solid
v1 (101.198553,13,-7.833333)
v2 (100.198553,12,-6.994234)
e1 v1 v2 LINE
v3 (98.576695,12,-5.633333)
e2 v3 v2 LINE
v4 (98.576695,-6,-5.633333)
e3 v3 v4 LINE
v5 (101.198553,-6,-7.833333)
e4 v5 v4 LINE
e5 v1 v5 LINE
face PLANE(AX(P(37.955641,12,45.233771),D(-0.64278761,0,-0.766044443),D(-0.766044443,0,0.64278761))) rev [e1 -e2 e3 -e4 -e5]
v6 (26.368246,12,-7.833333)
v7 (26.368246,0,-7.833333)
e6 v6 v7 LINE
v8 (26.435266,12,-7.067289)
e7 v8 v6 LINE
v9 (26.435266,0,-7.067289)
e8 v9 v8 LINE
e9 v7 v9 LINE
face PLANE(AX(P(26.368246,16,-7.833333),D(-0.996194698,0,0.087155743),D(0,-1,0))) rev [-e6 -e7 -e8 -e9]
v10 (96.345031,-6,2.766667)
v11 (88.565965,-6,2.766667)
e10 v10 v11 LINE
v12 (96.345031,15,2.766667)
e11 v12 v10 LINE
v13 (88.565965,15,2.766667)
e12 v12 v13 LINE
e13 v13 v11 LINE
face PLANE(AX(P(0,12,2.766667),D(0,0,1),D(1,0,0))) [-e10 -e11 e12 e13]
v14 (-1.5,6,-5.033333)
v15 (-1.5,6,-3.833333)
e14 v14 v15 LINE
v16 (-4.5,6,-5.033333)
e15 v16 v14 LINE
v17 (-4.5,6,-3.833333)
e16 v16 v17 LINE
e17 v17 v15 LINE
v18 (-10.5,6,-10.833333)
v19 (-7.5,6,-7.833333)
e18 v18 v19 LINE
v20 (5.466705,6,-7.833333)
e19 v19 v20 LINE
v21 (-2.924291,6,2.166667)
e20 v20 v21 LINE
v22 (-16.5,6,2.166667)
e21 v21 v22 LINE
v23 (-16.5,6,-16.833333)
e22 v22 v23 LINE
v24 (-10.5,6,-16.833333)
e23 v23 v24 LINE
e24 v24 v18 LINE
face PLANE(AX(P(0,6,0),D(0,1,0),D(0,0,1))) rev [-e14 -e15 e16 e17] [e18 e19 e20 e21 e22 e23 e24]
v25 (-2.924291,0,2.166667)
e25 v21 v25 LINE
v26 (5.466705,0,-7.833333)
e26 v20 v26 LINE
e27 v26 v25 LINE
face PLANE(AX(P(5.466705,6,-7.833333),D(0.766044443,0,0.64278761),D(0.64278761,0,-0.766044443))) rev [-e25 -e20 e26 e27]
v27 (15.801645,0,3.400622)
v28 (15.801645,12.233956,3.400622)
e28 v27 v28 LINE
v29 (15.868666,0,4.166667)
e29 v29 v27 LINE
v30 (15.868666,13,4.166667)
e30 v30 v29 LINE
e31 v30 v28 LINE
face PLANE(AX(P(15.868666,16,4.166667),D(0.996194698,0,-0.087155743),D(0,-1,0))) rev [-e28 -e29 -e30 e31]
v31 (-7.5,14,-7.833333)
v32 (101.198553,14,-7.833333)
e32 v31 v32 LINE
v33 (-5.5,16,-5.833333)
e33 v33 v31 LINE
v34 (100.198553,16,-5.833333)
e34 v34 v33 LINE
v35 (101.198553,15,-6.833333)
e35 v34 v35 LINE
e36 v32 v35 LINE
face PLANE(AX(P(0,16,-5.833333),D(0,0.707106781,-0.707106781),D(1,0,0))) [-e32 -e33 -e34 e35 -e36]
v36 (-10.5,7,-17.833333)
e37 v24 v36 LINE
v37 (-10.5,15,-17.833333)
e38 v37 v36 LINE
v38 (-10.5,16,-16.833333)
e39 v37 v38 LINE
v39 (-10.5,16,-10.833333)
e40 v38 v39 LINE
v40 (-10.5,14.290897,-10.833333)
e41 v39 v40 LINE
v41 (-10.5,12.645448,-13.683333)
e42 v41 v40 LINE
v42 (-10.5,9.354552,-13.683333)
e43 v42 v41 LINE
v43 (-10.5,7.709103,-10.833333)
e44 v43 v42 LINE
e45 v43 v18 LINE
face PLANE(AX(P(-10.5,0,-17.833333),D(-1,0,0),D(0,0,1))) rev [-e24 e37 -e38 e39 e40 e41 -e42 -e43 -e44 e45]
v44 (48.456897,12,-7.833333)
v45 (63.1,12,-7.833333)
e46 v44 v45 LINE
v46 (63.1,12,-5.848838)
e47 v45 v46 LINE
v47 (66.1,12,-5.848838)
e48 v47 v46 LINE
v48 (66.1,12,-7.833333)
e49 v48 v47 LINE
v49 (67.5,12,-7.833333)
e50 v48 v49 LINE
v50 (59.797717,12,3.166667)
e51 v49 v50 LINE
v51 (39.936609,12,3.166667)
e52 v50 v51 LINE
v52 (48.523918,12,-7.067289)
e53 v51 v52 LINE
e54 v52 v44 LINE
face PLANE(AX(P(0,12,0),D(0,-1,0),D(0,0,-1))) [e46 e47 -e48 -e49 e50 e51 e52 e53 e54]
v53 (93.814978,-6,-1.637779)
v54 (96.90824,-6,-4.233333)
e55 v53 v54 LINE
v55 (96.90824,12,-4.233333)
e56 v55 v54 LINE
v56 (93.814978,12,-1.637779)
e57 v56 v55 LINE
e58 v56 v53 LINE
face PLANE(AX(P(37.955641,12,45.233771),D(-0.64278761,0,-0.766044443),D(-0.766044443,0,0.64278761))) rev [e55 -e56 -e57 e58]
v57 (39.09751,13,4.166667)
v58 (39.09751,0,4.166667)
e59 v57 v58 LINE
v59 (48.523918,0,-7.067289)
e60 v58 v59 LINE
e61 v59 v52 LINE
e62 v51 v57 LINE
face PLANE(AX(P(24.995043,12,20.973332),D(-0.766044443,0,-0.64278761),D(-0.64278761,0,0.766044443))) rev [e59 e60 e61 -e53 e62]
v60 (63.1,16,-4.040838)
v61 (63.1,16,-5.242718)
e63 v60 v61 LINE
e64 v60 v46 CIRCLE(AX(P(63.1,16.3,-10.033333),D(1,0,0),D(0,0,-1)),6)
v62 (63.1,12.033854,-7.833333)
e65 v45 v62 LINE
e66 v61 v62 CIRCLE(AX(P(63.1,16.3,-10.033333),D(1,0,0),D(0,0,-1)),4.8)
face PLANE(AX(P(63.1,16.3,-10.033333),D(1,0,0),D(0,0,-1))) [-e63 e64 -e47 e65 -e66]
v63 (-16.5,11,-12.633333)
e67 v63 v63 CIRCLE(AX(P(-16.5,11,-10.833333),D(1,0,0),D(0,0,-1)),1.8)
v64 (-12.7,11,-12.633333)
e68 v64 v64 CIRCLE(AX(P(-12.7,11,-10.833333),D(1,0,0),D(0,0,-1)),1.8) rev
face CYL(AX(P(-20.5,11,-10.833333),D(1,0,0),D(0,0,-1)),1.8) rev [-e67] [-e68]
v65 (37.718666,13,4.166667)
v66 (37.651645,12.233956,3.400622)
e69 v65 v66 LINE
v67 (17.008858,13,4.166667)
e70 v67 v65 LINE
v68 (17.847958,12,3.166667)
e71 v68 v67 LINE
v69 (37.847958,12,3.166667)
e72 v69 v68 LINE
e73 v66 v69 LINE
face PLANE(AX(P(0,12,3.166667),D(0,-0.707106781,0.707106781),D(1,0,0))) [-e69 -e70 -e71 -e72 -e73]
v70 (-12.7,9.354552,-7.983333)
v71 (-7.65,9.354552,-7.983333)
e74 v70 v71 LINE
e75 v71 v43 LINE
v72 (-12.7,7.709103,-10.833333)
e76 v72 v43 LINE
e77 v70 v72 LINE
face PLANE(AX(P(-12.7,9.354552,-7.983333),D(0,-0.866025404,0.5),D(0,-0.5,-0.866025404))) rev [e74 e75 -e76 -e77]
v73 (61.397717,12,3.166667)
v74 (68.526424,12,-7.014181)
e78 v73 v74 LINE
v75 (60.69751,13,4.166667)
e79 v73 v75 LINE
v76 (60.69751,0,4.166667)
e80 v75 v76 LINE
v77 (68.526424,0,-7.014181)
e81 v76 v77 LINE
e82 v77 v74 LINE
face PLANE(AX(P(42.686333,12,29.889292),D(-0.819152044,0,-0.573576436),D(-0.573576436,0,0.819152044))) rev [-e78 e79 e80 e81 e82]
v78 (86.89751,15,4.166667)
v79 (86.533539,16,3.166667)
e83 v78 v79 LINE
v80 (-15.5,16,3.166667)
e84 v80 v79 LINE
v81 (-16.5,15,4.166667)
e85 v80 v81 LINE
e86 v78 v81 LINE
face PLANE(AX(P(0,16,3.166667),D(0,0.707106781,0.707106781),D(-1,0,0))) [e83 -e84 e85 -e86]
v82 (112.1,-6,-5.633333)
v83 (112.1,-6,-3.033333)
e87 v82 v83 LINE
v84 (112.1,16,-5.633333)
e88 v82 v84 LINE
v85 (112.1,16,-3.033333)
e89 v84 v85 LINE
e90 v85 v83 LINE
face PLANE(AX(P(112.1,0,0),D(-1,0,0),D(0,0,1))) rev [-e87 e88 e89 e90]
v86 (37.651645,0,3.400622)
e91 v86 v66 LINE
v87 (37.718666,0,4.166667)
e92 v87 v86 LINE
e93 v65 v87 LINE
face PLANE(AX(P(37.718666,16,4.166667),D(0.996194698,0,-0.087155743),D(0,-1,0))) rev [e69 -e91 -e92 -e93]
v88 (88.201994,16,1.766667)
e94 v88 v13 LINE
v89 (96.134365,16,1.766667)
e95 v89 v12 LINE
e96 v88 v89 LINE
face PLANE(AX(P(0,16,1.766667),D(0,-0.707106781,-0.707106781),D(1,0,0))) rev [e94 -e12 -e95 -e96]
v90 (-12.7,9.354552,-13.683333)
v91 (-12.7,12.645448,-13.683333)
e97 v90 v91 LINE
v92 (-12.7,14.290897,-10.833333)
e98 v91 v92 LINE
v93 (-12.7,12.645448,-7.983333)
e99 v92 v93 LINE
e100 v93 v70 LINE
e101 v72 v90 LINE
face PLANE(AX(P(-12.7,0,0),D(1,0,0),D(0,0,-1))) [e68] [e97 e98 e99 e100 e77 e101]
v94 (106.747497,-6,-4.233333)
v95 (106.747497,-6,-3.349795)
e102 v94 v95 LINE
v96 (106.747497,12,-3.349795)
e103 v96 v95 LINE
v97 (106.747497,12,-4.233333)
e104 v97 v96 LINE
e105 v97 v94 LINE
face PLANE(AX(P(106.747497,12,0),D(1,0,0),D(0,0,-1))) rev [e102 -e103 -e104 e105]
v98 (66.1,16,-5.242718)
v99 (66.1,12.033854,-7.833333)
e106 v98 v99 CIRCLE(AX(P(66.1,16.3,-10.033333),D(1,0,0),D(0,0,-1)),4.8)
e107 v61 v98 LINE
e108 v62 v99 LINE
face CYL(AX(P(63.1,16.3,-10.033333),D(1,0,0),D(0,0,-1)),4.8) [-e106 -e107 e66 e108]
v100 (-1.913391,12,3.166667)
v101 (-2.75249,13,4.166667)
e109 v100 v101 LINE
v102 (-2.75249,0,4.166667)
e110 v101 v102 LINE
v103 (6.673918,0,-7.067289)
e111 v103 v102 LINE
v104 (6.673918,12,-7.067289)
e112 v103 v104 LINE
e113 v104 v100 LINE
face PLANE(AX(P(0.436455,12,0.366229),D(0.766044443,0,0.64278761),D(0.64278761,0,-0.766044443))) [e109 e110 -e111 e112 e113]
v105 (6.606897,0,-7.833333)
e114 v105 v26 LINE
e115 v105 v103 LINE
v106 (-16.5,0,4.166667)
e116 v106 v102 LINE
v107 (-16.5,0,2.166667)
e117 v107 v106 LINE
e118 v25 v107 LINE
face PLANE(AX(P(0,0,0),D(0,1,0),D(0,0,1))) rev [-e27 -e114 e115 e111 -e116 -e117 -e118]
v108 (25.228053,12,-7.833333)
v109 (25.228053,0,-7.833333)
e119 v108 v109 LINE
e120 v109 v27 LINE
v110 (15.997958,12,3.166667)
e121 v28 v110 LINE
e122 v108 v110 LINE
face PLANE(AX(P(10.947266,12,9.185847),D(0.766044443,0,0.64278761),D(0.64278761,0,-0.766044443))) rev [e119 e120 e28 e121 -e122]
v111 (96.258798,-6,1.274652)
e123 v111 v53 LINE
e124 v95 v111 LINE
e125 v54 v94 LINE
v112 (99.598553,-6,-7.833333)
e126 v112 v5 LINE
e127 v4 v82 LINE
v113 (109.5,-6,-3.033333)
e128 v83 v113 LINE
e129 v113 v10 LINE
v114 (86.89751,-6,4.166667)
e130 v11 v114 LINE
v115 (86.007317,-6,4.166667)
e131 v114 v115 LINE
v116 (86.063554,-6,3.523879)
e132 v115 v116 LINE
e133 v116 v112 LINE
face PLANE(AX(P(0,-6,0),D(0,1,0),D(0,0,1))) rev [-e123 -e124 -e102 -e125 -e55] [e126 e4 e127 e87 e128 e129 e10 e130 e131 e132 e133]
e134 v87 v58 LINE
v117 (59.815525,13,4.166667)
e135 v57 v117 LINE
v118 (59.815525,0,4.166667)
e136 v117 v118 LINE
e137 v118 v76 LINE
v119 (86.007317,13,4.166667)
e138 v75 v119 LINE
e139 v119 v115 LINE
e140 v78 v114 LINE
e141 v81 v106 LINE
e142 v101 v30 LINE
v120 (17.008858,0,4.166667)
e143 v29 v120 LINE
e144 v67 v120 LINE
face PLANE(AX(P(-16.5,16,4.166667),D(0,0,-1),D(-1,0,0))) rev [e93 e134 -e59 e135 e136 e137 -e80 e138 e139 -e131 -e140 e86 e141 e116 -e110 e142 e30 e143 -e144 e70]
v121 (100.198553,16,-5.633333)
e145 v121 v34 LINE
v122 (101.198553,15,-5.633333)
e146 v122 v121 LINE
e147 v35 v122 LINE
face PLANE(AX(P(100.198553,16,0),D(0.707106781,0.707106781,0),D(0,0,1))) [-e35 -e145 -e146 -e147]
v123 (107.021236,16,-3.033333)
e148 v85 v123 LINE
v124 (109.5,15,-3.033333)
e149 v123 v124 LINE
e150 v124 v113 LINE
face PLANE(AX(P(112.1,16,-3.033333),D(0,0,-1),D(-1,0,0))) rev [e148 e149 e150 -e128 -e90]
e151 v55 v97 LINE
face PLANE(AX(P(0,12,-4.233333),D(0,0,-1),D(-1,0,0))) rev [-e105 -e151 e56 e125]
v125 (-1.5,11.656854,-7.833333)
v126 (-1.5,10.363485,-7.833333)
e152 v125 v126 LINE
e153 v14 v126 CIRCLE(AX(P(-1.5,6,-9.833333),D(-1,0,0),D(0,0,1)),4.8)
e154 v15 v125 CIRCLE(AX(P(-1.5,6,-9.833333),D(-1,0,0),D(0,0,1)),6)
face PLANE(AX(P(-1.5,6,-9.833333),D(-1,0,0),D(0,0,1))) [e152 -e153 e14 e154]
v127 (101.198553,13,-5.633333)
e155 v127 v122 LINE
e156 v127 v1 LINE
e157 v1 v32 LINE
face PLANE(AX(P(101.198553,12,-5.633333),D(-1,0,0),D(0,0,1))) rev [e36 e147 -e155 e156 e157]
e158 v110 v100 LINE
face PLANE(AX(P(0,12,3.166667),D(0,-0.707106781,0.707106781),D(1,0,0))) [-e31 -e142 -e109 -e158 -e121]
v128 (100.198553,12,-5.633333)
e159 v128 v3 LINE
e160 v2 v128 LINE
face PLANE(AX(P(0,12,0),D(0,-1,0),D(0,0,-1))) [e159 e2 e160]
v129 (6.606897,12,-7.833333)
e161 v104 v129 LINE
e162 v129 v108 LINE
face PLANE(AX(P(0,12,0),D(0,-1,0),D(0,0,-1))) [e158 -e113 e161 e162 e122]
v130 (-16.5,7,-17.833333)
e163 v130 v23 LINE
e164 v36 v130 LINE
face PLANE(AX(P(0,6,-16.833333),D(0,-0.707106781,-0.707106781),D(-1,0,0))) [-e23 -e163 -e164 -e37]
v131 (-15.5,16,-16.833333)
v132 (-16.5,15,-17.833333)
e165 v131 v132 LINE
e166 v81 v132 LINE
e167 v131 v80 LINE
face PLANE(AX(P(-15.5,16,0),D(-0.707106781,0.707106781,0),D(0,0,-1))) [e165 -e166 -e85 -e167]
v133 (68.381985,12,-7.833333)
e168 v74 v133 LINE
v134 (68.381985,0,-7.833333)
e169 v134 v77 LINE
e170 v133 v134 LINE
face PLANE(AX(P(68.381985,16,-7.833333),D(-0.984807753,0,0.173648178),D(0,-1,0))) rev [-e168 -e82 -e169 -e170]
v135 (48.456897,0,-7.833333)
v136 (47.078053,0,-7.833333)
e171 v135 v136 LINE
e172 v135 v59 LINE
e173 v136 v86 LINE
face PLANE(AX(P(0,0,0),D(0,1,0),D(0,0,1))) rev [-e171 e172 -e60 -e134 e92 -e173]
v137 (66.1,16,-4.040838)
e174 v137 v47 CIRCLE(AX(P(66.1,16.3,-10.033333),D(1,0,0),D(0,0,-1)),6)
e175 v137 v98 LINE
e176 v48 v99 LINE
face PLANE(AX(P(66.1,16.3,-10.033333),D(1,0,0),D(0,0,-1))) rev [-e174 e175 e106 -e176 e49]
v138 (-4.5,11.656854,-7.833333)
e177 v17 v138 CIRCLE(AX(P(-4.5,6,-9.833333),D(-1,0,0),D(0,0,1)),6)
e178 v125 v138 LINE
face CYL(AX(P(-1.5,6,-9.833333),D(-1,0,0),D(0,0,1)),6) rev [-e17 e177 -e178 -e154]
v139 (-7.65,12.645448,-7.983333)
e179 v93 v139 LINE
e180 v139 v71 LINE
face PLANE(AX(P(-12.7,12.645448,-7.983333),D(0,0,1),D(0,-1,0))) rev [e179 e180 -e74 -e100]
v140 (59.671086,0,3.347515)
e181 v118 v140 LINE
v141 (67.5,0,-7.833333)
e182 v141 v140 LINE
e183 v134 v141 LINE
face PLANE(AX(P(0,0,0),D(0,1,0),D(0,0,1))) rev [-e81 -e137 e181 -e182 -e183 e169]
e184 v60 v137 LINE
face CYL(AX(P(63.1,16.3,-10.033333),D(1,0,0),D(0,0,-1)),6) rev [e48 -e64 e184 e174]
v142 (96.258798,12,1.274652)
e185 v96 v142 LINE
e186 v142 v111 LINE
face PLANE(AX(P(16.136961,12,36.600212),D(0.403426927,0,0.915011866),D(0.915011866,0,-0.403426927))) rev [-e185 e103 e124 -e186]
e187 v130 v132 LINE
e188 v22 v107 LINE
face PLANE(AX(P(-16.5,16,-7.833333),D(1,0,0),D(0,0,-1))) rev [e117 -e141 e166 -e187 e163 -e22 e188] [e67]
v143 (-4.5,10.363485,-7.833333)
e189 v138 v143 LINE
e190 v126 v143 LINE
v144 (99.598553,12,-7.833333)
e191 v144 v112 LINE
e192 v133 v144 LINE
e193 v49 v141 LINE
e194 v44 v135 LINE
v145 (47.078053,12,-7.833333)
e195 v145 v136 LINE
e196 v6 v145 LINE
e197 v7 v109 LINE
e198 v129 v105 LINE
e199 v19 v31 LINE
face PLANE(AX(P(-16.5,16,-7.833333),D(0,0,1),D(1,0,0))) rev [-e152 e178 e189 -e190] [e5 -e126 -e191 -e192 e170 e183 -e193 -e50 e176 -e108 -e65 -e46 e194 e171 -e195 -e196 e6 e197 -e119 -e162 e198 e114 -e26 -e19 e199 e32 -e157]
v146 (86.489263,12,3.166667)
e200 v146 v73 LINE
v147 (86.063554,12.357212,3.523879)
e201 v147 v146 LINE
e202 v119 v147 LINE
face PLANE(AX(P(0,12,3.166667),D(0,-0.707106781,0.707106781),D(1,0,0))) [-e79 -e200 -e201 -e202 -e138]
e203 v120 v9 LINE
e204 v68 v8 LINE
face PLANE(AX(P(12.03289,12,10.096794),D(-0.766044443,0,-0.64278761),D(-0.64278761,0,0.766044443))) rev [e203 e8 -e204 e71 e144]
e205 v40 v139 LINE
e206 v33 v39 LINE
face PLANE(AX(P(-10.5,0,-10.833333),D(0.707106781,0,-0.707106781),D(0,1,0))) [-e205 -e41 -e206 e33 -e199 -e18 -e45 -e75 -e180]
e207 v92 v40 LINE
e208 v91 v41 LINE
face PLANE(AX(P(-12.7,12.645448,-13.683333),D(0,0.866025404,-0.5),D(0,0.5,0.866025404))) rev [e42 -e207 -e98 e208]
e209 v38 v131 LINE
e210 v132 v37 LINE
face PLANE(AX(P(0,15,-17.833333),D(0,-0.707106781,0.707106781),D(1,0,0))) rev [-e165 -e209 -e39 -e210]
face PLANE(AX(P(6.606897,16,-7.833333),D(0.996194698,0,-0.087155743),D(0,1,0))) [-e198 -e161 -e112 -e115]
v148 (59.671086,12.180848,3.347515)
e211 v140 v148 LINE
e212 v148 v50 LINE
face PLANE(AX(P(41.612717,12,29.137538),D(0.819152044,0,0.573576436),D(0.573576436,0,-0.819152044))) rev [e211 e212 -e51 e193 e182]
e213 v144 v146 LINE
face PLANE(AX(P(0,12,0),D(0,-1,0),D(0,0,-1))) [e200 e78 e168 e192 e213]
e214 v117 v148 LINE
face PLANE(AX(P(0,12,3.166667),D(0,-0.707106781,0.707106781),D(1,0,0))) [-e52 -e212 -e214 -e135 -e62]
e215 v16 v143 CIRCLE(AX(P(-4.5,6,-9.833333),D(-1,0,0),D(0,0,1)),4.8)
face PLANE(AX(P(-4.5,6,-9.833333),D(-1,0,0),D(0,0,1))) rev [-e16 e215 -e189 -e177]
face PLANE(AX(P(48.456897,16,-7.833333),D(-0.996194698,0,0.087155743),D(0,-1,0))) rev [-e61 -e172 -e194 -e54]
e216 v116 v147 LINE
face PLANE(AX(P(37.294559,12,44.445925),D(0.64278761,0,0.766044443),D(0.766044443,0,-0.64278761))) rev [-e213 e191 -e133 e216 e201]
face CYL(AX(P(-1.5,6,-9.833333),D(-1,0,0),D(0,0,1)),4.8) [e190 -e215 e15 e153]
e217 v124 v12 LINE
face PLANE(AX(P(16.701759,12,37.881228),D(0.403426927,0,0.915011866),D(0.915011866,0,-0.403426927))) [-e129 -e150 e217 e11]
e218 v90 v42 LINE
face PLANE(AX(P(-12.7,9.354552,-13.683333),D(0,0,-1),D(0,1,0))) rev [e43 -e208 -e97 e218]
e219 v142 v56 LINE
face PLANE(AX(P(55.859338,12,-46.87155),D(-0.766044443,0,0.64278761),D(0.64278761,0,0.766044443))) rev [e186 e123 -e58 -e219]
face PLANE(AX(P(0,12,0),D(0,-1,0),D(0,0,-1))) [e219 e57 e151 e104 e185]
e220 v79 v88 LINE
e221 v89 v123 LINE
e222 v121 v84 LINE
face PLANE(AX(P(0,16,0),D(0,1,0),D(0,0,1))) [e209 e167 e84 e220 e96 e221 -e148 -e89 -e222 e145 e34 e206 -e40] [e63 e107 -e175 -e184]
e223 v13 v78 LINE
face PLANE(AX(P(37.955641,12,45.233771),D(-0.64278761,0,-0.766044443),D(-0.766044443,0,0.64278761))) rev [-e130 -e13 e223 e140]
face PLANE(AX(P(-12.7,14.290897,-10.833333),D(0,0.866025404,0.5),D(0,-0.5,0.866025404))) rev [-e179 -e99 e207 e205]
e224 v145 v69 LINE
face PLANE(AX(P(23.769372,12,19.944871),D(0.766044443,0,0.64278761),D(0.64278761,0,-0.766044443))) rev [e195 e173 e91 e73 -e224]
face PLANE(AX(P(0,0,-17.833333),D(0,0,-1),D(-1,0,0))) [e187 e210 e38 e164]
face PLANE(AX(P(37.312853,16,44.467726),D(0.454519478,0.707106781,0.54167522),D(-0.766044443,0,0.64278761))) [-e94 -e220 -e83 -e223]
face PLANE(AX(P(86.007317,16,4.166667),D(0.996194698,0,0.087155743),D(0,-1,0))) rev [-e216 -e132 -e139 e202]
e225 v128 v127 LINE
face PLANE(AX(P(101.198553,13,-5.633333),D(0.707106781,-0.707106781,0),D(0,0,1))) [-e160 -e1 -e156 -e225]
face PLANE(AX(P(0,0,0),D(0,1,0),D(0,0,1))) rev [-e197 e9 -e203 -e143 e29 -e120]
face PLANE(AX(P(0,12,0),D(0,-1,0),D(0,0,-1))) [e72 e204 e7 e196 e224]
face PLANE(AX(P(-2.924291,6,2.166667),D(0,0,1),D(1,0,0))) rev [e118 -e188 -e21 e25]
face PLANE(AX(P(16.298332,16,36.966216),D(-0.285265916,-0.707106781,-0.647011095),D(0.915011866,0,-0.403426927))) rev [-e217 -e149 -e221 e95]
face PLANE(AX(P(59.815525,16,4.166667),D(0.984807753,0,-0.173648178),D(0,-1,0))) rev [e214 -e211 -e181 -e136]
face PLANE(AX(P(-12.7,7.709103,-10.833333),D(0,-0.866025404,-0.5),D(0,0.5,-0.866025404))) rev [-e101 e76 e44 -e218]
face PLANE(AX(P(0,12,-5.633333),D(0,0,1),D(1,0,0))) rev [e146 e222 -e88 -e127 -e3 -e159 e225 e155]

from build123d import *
from OCP.BRepFilletAPI import BRepFilletAPI_MakeChamfer

# Parameters (mm, degrees)
SKETCH1_W           = 126
SKETCH1_H           = 12
BOSS_EXTRUDE1_DEPTH = 16
SKETCH2_W           = 6
SKETCH2_H           = 16
BOSS_EXTRUDE2_DEPTH = 10
SKETCH3_R           = 1.8
CUT_EXTRUDE1_DEPTH  = 10
CUT_EXTRUDE2_DEPTH  = 2.2
CHAMFER1_SIZE       = 3
CUT_EXTRUDE4_DEPTH  = 12
CUT_EXTRUDE5_DEPTH  = 6
SKETCH8_W           = 8.301447347
SKETCH8_H           = 4
CUT_EXTRUDE6_DEPTH  = 2.2
CUT_EXTRUDE7_DEPTH  = 112.589774522
SKETCH10_W          = 2.6
SKETCH10_H          = 16
BOSS_EXTRUDE3_DEPTH = 2.6
CHAMFER2_SIZE       = 2
CHAMFER3_SIZE       = 1
CHAMFER3_SIZE2      = 0.709807814
CHAMFER3_SIZE2_2    = 0.718015043
CUT_EXTRUDE8_START  = -12
SKETCH11_R          = 6
SKETCH11_R_2        = 4.8
CUT_EXTRUDE8_DEPTH  = 3
BOSS_EXTRUDE4_DEPTH = 6
CHAMFER4_SIZE       = 1
CUT_EXTRUDE9_START  = -46
SKETCH13_R          = 6
SKETCH13_R_2        = 4.8
CUT_EXTRUDE9_DEPTH  = 3


with BuildPart() as part:
    # Sketch1 → Boss-Extrude1 (new body)
    with BuildSketch(Plane(origin=(0, 0, 0), x_dir=(1, 0, 0), z_dir=(0, 1, 0))):
        with Locations((46.5, 1.833333333)):
            Rectangle(SKETCH1_W, SKETCH1_H)
    extrude(amount=BOSS_EXTRUDE1_DEPTH)

    # Sketch2 → Boss-Extrude2 (add)
    with BuildSketch(Plane(origin=(0, 0, -7.833333333), x_dir=(-1, 0, 0), z_dir=(0, 0, -1))):
        with Locations((13.5, 8)):
            Rectangle(SKETCH2_W, SKETCH2_H)
    extrude(amount=BOSS_EXTRUDE2_DEPTH)

    # Sketch3 → Cut-Extrude1 (cut)
    with BuildSketch(Plane(origin=(-10.5, 0, 0), x_dir=(0, 0, -1), z_dir=(1, 0, 0))):
        with Locations((10.833333333, 11)):
            Circle(SKETCH3_R)
    extrude(amount=-CUT_EXTRUDE1_DEPTH, mode=Mode.SUBTRACT)

    # Sketch4 → Cut-Extrude2 (cut)
    with BuildSketch(Plane(origin=(-10.5, 0, 0), x_dir=(0, 0, -1), z_dir=(1, 0, 0))):
        Polygon((7.983333333, 12.645448267), (7.983333333, 9.354551733), (10.833333333, 7.709103466), (13.683333333, 9.354551733), (13.683333333, 12.645448267), (10.833333333, 14.290896534), align=None)
    extrude(amount=-CUT_EXTRUDE2_DEPTH, mode=Mode.SUBTRACT)

    # Chamfer1
    # the kernel refuses this chamfer: 3 mm, written as the material it adds along each edge
    with BuildSketch(Plane(origin=(-10.5, 0, -7.833333333), x_dir=(1, 0, 0), z_dir=(0, 1, 0))) as chamfer1_piece_1_section:
        Polygon((CHAMFER1_SIZE, 0), (0, CHAMFER1_SIZE), (0, 0), align=None)
    chamfer1_piece_1 = extrude(amount=16, mode=Mode.PRIVATE)
    chamfer1_piece_1 = split(chamfer1_piece_1, bisect_by=Plane(origin=(-10.5, 0, -7.983333333), z_dir=(0, 0, 1)), keep=Keep.TOP, mode=Mode.PRIVATE)
    add(chamfer1_piece_1)
    with BuildSketch(Plane(origin=(-10.5, 0, -7.833333333), x_dir=(1, 0, 0), z_dir=(0, 1, 0))) as chamfer1_piece_2_section:
        Polygon((CHAMFER1_SIZE, 0), (0, CHAMFER1_SIZE), (0, 0), align=None)
    chamfer1_piece_2 = extrude(amount=23.715048964, mode=Mode.PRIVATE)
    chamfer1_piece_2 = split(chamfer1_piece_2, bisect_by=Plane(origin=(-10.5, 7.080865705, -11.921473054), z_dir=(0, -0.8660254037844421, 0.499999999999994)), keep=Keep.TOP, mode=Mode.PRIVATE)
    add(chamfer1_piece_2)
    with BuildSketch(Plane(origin=(-10.5, -7.715048964, -7.833333333), x_dir=(1, 0, 0), z_dir=(0, 1, 0))) as chamfer1_piece_3_section:
        Polygon((CHAMFER1_SIZE, 0), (0, CHAMFER1_SIZE), (0, 0), align=None)
    chamfer1_piece_3 = extrude(amount=23.715048964, mode=Mode.PRIVATE)
    chamfer1_piece_3 = split(chamfer1_piece_3, bisect_by=Plane(origin=(-10.5, 7.490372054, 0.945520585), z_dir=(0, 0.8660254037844354, 0.5000000000000058)), keep=Keep.TOP, mode=Mode.PRIVATE)
    add(chamfer1_piece_3)

    # Sketch6 → Cut-Extrude4 (cut)
    with BuildSketch(Plane.XZ):
        Polygon((27.078053453, -7.833333333), (47.078053453, -7.833333333), (37.008857879, 4.166666667), (17.008857879, 4.166666667), align=None)
        Polygon((49.166705116, -7.833333333), (67.5, -7.833333333), (59.097509541, 4.166666667), (39.097509541, 4.166666667), align=None)
        Polygon((7.316705116, -7.833333333), (25.228053453, -7.833333333), (15.158857879, 4.166666667), (-2.752490459, 4.166666667), (-1.819672283, 3.054977255), align=None)
        Polygon((60.697509541, 4.166666667), (69.1, -7.833333333), (99.598552653, -7.833333333), (85.297509541, 4.166666667), align=None)
        Polygon((109.5, 2.766666667), (96.345030751, 2.766666667), (109.5, -3.033333333), align=None)
        Polygon((93.814978285, -1.637778805), (96.908239719, -4.233333333), (106.747497018, -4.233333333), (106.747497018, -3.349795), (96.258797751, 1.274651823), align=None)
        Polygon((98.576694749, -5.633333333), (101.198552653, -7.833333333), (109.5, -7.833333333), (109.5, -5.633333333), align=None)
        Polygon((109.5, 4.166666667), (86.897509541, 4.166666667), (88.565964571, 2.766666667), (96.345030751, 2.766666667), (109.5, 2.766666667), align=None)
    extrude(amount=-CUT_EXTRUDE4_DEPTH, mode=Mode.SUBTRACT)

    # Sketch7 → Cut-Extrude5 (cut)
    with BuildSketch(Plane.XZ):
        Polygon((5.466705116, -7.833333333), (-2.924291196, 2.166666667), (-16.5, 2.166666667), (-16.5, -17.833333333), (-10.5, -17.833333333), (-10.5, -10.833333333), (-7.5, -7.833333333), align=None)
    extrude(amount=-CUT_EXTRUDE5_DEPTH, mode=Mode.SUBTRACT)

    # Sketch8 → Cut-Extrude6 (cut)
    with BuildSketch(Plane(origin=(0, 0, -7.833333333), x_dir=(-1, 0, 0), z_dir=(0, 0, -1))):
        with Locations((-105.349276327, 14)):
            Rectangle(SKETCH8_W, SKETCH8_H)
    extrude(amount=-CUT_EXTRUDE6_DEPTH, mode=Mode.SUBTRACT)

    # Sketch9 → Cut-Extrude7 (cut, through all)
    with BuildSketch(Plane.XZ.offset(-12)):
        Polygon((109.5, -3.033333333), (109.5, 4.166666667), (86.897509541, 4.166666667), (88.565964571, 2.766666667), (96.345030751, 2.766666667), align=None)
    extrude(amount=-CUT_EXTRUDE7_DEPTH, mode=Mode.SUBTRACT)

    # Sketch10 → Boss-Extrude3 (add)
    with BuildSketch(Plane(origin=(109.5, 0, 0), x_dir=(0, 0, -1), z_dir=(1, 0, 0))):
        with Locations((4.333333333, 8)):
            Rectangle(SKETCH10_W, SKETCH10_H)
    extrude(amount=BOSS_EXTRUDE3_DEPTH)

    # Chamfer2
    chamfer2_edges = [part.edges().sort_by_distance(p)[0] for p in [
        (46.849276326, 16, -7.833333333),
    ]]
    chamfer(chamfer2_edges, length=CHAMFER2_SIZE)

    # Chamfer3: one chamfer whose edges measure the first distance from different faces: ONE call of the kernel's chamfer builder (chamfer() names one face for all edges)
    chamfer3_edges_1 = [part.edges().sort_by_distance(p)[0] for p in [
        (7.316705116, 6, -7.833333333),
    ]]
    chamfer3_side_1 = [part.faces().sort_by_distance(p)[0] for p in [
        (2.282107329, 6, -1.833333333),
    ]]
    chamfer3_edges_2 = [part.edges().sort_by_distance(p)[0] for p in [
        (15.158857879, 6, 4.166666667),
    ]]
    chamfer3_side_2 = [part.faces().sort_by_distance(p)[0] for p in [
        (20.193455666, 6, -1.833333333),
    ]]
    chamfer3_edges_3 = [part.edges().sort_by_distance(p)[0] for p in [
        (59.097509541, 6, 4.166666667),
    ]]
    chamfer3_side_3 = [part.faces().sort_by_distance(p)[0] for p in [
        (63.298754771, 6, -1.833333333),
    ]]
    chamfer3_edges_4 = [part.edges().sort_by_distance(p)[0] for p in [
        (49.166705116, 6, -7.833333333),
    ]]
    chamfer3_side_4 = [part.faces().sort_by_distance(p)[0] for p in [
        (44.132107329, 6, -1.833333333),
    ]]
    chamfer3_edges_5 = [part.edges().sort_by_distance(p)[0] for p in [
        (37.008857879, 6, 4.166666667),
    ]]
    chamfer3_side_5 = [part.faces().sort_by_distance(p)[0] for p in [
        (42.043455666, 6, -1.833333333),
    ]]
    chamfer3_edges_6 = [part.edges().sort_by_distance(p)[0] for p in [
        (27.078053453, 6, -7.833333333),
    ]]
    chamfer3_side_6 = [part.faces().sort_by_distance(p)[0] for p in [
        (22.043455666, 6, -1.833333333),
    ]]
    chamfer3_edges_7 = [part.edges().sort_by_distance(p)[0] for p in [
        (-13.5, 16, -17.833333333),
        (-13.5, 6, -17.833333333),
        (-16.5, 16, -6.833333333),
        (35.198754771, 16, 4.166666667),
    ]]
    chamfer3_edges_8 = [part.edges().sort_by_distance(p)[0] for p in [
        (85.297509541, 6, 4.166666667),
    ]]
    chamfer3_side_8 = [part.faces().sort_by_distance(p)[0] for p in [
        (92.448031097, 6, -1.833333333),
    ]]
    chamfer3_edges_9 = [part.edges().sort_by_distance(p)[0] for p in [
        (69.1, 6, -7.833333333),
    ]]
    chamfer3_side_9 = [part.faces().sort_by_distance(p)[0] for p in [
        (64.898754771, 6, -1.833333333),
    ]]
    chamfer3 = BRepFilletAPI_MakeChamfer(part.part.solid().wrapped)
    for e in chamfer3_edges_1:
        chamfer3.Add(CHAMFER3_SIZE, CHAMFER3_SIZE2, e.wrapped, chamfer3_side_1[0].wrapped)  # the first distance lies on this face
    for e in chamfer3_edges_2:
        chamfer3.Add(CHAMFER3_SIZE, CHAMFER3_SIZE2, e.wrapped, chamfer3_side_2[0].wrapped)  # the first distance lies on this face
    for e in chamfer3_edges_3:
        chamfer3.Add(CHAMFER3_SIZE, CHAMFER3_SIZE2_2, e.wrapped, chamfer3_side_3[0].wrapped)  # the first distance lies on this face
    for e in chamfer3_edges_4:
        chamfer3.Add(CHAMFER3_SIZE, CHAMFER3_SIZE2, e.wrapped, chamfer3_side_4[0].wrapped)  # the first distance lies on this face
    for e in chamfer3_edges_5:
        chamfer3.Add(CHAMFER3_SIZE, CHAMFER3_SIZE2, e.wrapped, chamfer3_side_5[0].wrapped)  # the first distance lies on this face
    for e in chamfer3_edges_6:
        chamfer3.Add(CHAMFER3_SIZE, CHAMFER3_SIZE2, e.wrapped, chamfer3_side_6[0].wrapped)  # the first distance lies on this face
    for e in chamfer3_edges_7:
        chamfer3.Add(CHAMFER3_SIZE, e.wrapped)
    for e in chamfer3_edges_8:
        chamfer3.Add(CHAMFER3_SIZE, CHAMFER3_SIZE2, e.wrapped, chamfer3_side_8[0].wrapped)  # the first distance lies on this face
    for e in chamfer3_edges_9:
        chamfer3.Add(CHAMFER3_SIZE, CHAMFER3_SIZE2_2, e.wrapped, chamfer3_side_9[0].wrapped)  # the first distance lies on this face
    add(Compound.cast(chamfer3.Shape()), mode=Mode.REPLACE)

    # Sketch11 → Cut-Extrude8 (cut)
    with BuildSketch(Plane.ZY.offset(16.5).offset(CUT_EXTRUDE8_START)):
        with Locations((-9.833333333, 6)):
            Circle(SKETCH11_R)
        with Locations((-9.833333333, 6)):
            Circle(SKETCH11_R_2, mode=Mode.SUBTRACT)
    extrude(amount=-CUT_EXTRUDE8_DEPTH, mode=Mode.SUBTRACT)

    # Sketch12 → Boss-Extrude4 (add)
    with BuildSketch(Plane.XZ):
        Polygon((86.007317356, 4.166666667), (86.063553985, 3.523879057), (99.598552653, -7.833333333), (101.198552653, -7.833333333), (98.576694749, -5.633333333), (112.1, -5.633333333), (112.1, -3.033333333), (109.5, -3.033333333), (96.345030751, 2.766666667), (88.565964571, 2.766666667), (86.897509541, 4.166666667), align=None)
        Polygon((96.258797751, 1.274651823), (93.814978285, -1.637778805), (96.908239719, -4.233333333), (106.747497018, -4.233333333), (106.747497018, -3.349795), align=None, mode=Mode.SUBTRACT)
    extrude(amount=BOSS_EXTRUDE4_DEPTH)

    # Chamfer4
    # the kernel refuses this chamfer: 1 mm, written as the material it takes off along each edge
    with BuildSketch(Plane(origin=(-5.324173446, 12, 4.166666667), x_dir=(0, 1, 0), z_dir=(1, 0, 0))) as chamfer4_piece_1_section:
        Polygon((CHAMFER4_SIZE, 0), (0, -CHAMFER4_SIZE), (0, 0), align=None)
    chamfer4_piece_1 = extrude(amount=23.764522127, mode=Mode.PRIVATE)
    chamfer4_piece_1 = split(chamfer4_piece_1, bisect_by=Plane(origin=(-3.81504792, 12, 5.432973339), z_dir=(0.7660444431189749, 0, 0.6427876096865432)), keep=Keep.TOP, mode=Mode.PRIVATE)
    chamfer4_piece_1 = split(chamfer4_piece_1, bisect_by=Plane(origin=(6.695762747, 12, 14.252590694), z_dir=(-0.766044443118975, 0, -0.642787609686543)), keep=Keep.TOP, mode=Mode.PRIVATE)
    add(chamfer4_piece_1, mode=Mode.SUBTRACT)
    with BuildSketch(Plane(origin=(-5.324173446, 12, 4.166666667), x_dir=(0, 1, 0), z_dir=(1, 0, 0))) as chamfer4_piece_2_section:
        Polygon((CHAMFER4_SIZE, 0), (0, -CHAMFER4_SIZE), (0, 0), align=None)
    chamfer4_piece_2 = extrude(amount=23.764522127, mode=Mode.PRIVATE)
    chamfer4_piece_2 = split(chamfer4_piece_2, bisect_by=Plane(origin=(15.707682269, 12, 2.326617719), z_dir=(-0.9961946980917459, 0, 0.08715574274765488)), keep=Keep.TOP, mode=Mode.PRIVATE)
    chamfer4_piece_2 = split(chamfer4_piece_2, bisect_by=Plane(origin=(6.695762747, 12, 14.252590694), z_dir=(0.766044443118975, 0, 0.642787609686543)), keep=Keep.TOP, mode=Mode.PRIVATE)
    add(chamfer4_piece_2, mode=Mode.SUBTRACT)
    with BuildSketch(Plane(origin=(-5.324173446, 12, 4.166666667), x_dir=(0, 1, 0), z_dir=(1, 0, 0))) as chamfer4_piece_3_section:
        Polygon((CHAMFER4_SIZE, 0), (0, -CHAMFER4_SIZE), (0, 0), align=None)
    chamfer4_piece_3 = extrude(amount=23.764522127, mode=Mode.PRIVATE)
    chamfer4_piece_3 = split(chamfer4_piece_3, bisect_by=Plane(origin=(7.781387312, 12, 15.163537865), z_dir=(0.7660444431189742, 0, 0.642787609686544)), keep=Keep.TOP, mode=Mode.PRIVATE)
    add(chamfer4_piece_3, mode=Mode.SUBTRACT)
    with BuildSketch(Plane(origin=(36.525826554, 12, 4.166666667), x_dir=(0, 1, 0), z_dir=(1, 0, 0))) as chamfer4_piece_4_section:
        Polygon((CHAMFER4_SIZE, 0), (0, -CHAMFER4_SIZE), (0, 0), align=None)
    chamfer4_piece_4 = extrude(amount=25.861381019, mode=Mode.PRIVATE)
    chamfer4_piece_4 = split(chamfer4_piece_4, bisect_by=Plane(origin=(36.809280971, 12, 4.404513164), z_dir=(-0.7660444431189739, 0, -0.6427876096865442)), keep=Keep.TOP, mode=Mode.PRIVATE)
    add(chamfer4_piece_4, mode=Mode.SUBTRACT)
    with BuildSketch(Plane(origin=(36.525826554, 12, 4.166666667), x_dir=(0, 1, 0), z_dir=(1, 0, 0))) as chamfer4_piece_5_section:
        Polygon((CHAMFER4_SIZE, 0), (0, -CHAMFER4_SIZE), (0, 0), align=None)
    chamfer4_piece_5 = extrude(amount=25.861381019, mode=Mode.PRIVATE)
    chamfer4_piece_5 = split(chamfer4_piece_5, bisect_by=Plane(origin=(37.709604739, 12, 4.063099495), z_dir=(-0.9961946980917457, 0, 0.0871557427476573)), keep=Keep.TOP, mode=Mode.PRIVATE)
    add(chamfer4_piece_5, mode=Mode.SUBTRACT)
    with BuildSketch(Plane(origin=(36.525826554, 12, 4.166666667), x_dir=(0, 1, 0), z_dir=(1, 0, 0))) as chamfer4_piece_6_section:
        Polygon((CHAMFER4_SIZE, 0), (0, -CHAMFER4_SIZE), (0, 0), align=None)
    chamfer4_piece_6 = extrude(amount=25.861381019, mode=Mode.PRIVATE)
    chamfer4_piece_6 = split(chamfer4_piece_6, bisect_by=Plane(origin=(38.03495208, 12, 5.432973339), z_dir=(0.7660444431189741, 0, 0.6427876096865441)), keep=Keep.TOP, mode=Mode.PRIVATE)
    chamfer4_piece_6 = split(chamfer4_piece_6, bisect_by=Plane(origin=(51.671653173, 12, 14.771888638), z_dir=(-0.8191520442889891, 0, -0.57357643635105)), keep=Keep.TOP, mode=Mode.PRIVATE)
    add(chamfer4_piece_6, mode=Mode.SUBTRACT)
    with BuildSketch(Plane(origin=(36.525826554, 12, 4.166666667), x_dir=(0, 1, 0), z_dir=(1, 0, 0))) as chamfer4_piece_7_section:
        Polygon((CHAMFER4_SIZE, 0), (0, -CHAMFER4_SIZE), (0, 0), align=None)
    chamfer4_piece_7 = extrude(amount=25.861381019, mode=Mode.PRIVATE)
    chamfer4_piece_7 = split(chamfer4_piece_7, bisect_by=Plane(origin=(59.113254259, 12, 0.183893737), z_dir=(-0.9848077530122082, 0, 0.17364817766692958)), keep=Keep.TOP, mode=Mode.PRIVATE)
    chamfer4_piece_7 = split(chamfer4_piece_7, bisect_by=Plane(origin=(51.671653173, 12, 14.771888638), z_dir=(0.8191520442889891, 0, 0.57357643635105)), keep=Keep.TOP, mode=Mode.PRIVATE)
    add(chamfer4_piece_7, mode=Mode.SUBTRACT)
    with BuildSketch(Plane(origin=(36.525826554, 12, 4.166666667), x_dir=(0, 1, 0), z_dir=(1, 0, 0))) as chamfer4_piece_8_section:
        Polygon((CHAMFER4_SIZE, 0), (0, -CHAMFER4_SIZE), (0, 0), align=None)
    chamfer4_piece_8 = extrude(amount=25.861381019, mode=Mode.PRIVATE)
    chamfer4_piece_8 = split(chamfer4_piece_8, bisect_by=Plane(origin=(52.745269287, 12, 15.523642735), z_dir=(0.8191520442889892, 0, 0.5735764363510499)), keep=Keep.TOP, mode=Mode.PRIVATE)
    add(chamfer4_piece_8, mode=Mode.SUBTRACT)
    with BuildSketch(Plane(origin=(14.437174891, 12, 4.166666667), x_dir=(0, 1, 0), z_dir=(1, 0, 0))) as chamfer4_piece_9_section:
        Polygon((CHAMFER4_SIZE, 0), (0, -CHAMFER4_SIZE), (0, 0), align=None)
    chamfer4_piece_9 = extrude(amount=25.85317379, mode=Mode.PRIVATE)
    chamfer4_piece_9 = split(chamfer4_piece_9, bisect_by=Plane(origin=(14.860675852, 12, 4.522026168), z_dir=(-0.766044443118975, 0, -0.642787609686543)), keep=Keep.TOP, mode=Mode.PRIVATE)
    add(chamfer4_piece_9, mode=Mode.SUBTRACT)
    with BuildSketch(Plane(origin=(14.437174891, 12, 4.166666667), x_dir=(0, 1, 0), z_dir=(1, 0, 0))) as chamfer4_piece_10_section:
        Polygon((CHAMFER4_SIZE, 0), (0, -CHAMFER4_SIZE), (0, 0), align=None)
    chamfer4_piece_10 = extrude(amount=25.85317379, mode=Mode.PRIVATE)
    chamfer4_piece_10 = split(chamfer4_piece_10, bisect_by=Plane(origin=(15.857791912, 12, 4.042378782), z_dir=(-0.9961946980917459, 0, 0.08715574274765488)), keep=Keep.TOP, mode=Mode.PRIVATE)
    add(chamfer4_piece_10, mode=Mode.SUBTRACT)
    with BuildSketch(Plane(origin=(14.437174891, 12, 4.166666667), x_dir=(0, 1, 0), z_dir=(1, 0, 0))) as chamfer4_piece_11_section:
        Polygon((CHAMFER4_SIZE, 0), (0, -CHAMFER4_SIZE), (0, 0), align=None)
    chamfer4_piece_11 = extrude(amount=25.85317379, mode=Mode.PRIVATE)
    chamfer4_piece_11 = split(chamfer4_piece_11, bisect_by=Plane(origin=(15.946300417, 12, 5.432973339), z_dir=(0.7660444431189742, 0, 0.642787609686544)), keep=Keep.TOP, mode=Mode.PRIVATE)
    chamfer4_piece_11 = split(chamfer4_piece_11, bisect_by=Plane(origin=(27.682782193, 12, 15.281050869), z_dir=(-0.7660444431189739, 0, -0.6427876096865442)), keep=Keep.TOP, mode=Mode.PRIVATE)
    add(chamfer4_piece_11, mode=Mode.SUBTRACT)
    with BuildSketch(Plane(origin=(14.437174891, 12, 4.166666667), x_dir=(0, 1, 0), z_dir=(1, 0, 0))) as chamfer4_piece_12_section:
        Polygon((CHAMFER4_SIZE, 0), (0, -CHAMFER4_SIZE), (0, 0), align=None)
    chamfer4_piece_12 = extrude(amount=25.85317379, mode=Mode.PRIVATE)
    chamfer4_piece_12 = split(chamfer4_piece_12, bisect_by=Plane(origin=(37.541816614, 12, 2.145272441), z_dir=(-0.9961946980917457, 0, 0.0871557427476573)), keep=Keep.TOP, mode=Mode.PRIVATE)
    chamfer4_piece_12 = split(chamfer4_piece_12, bisect_by=Plane(origin=(27.682782193, 12, 15.281050869), z_dir=(0.7660444431189739, 0, 0.6427876096865442)), keep=Keep.TOP, mode=Mode.PRIVATE)
    add(chamfer4_piece_12, mode=Mode.SUBTRACT)
    with BuildSketch(Plane(origin=(14.437174891, 12, 4.166666667), x_dir=(0, 1, 0), z_dir=(1, 0, 0))) as chamfer4_piece_13_section:
        Polygon((CHAMFER4_SIZE, 0), (0, -CHAMFER4_SIZE), (0, 0), align=None)
    chamfer4_piece_13 = extrude(amount=25.85317379, mode=Mode.PRIVATE)
    chamfer4_piece_13 = split(chamfer4_piece_13, bisect_by=Plane(origin=(28.908453302, 12, 16.309511045), z_dir=(0.7660444431189741, 0, 0.6427876096865441)), keep=Keep.TOP, mode=Mode.PRIVATE)
    add(chamfer4_piece_13, mode=Mode.SUBTRACT)
    with BuildSketch(Plane(origin=(101.198552653, 16, -8.405016321), x_dir=(-1, 0, 0), z_dir=(0, 0, 1))) as chamfer4_piece_14:
        Polygon((CHAMFER4_SIZE, 0), (0, CHAMFER4_SIZE), (0, 0), align=None)
    extrude(amount=2.771682988, mode=Mode.SUBTRACT)
    with BuildSketch(Plane(origin=(101.198552653, 12, -10.405016321), x_dir=(-1, 0, 0), z_dir=(0, 0, 1))) as chamfer4_piece_15_section:
        Polygon((CHAMFER4_SIZE, 0), (0, -CHAMFER4_SIZE), (0, 0), align=None)
    chamfer4_piece_15 = extrude(amount=4.771682988, mode=Mode.PRIVATE)
    chamfer4_piece_15 = split(chamfer4_piece_15, bisect_by=Plane(origin=(102.464859325, 12, -8.895890795), z_dir=(0.6427876096865404, 0, 0.7660444431189771)), keep=Keep.TOP, mode=Mode.PRIVATE)
    add(chamfer4_piece_15, mode=Mode.SUBTRACT)
    with BuildSketch(Plane(origin=(111.853120449, 16, -4.070819499), x_dir=(0, -1, 0), z_dir=(-0.9150118657328382, 0, 0.40342692717282824))) as chamfer4_piece_16_section:
        Polygon((CHAMFER4_SIZE, 0), (0, -CHAMFER4_SIZE), (0, 0), align=None)
    chamfer4_piece_16 = extrude(amount=19.52019511, mode=Mode.PRIVATE)
    chamfer4_piece_16 = split(chamfer4_piece_16, bisect_by=Plane(origin=(111.853120449, 16, -3.033333333), z_dir=(0, 0, 1)), keep=Keep.TOP, mode=Mode.PRIVATE)
    add(chamfer4_piece_16, mode=Mode.SUBTRACT)
    with BuildSketch(Plane(origin=(98.916713739, 16, 2.766666667), x_dir=(0, -1, 0), z_dir=(-1, 0, 0))) as chamfer4_piece_17_section:
        Polygon((CHAMFER4_SIZE, 0), (0, -CHAMFER4_SIZE), (0, 0), align=None)
    chamfer4_piece_17 = extrude(amount=12.922432156, mode=Mode.PRIVATE)
    chamfer4_piece_17 = split(chamfer4_piece_17, bisect_by=Plane(origin=(96.456979825, 12.173333342, -0.164730062), z_dir=(0.4545194776720475, 0.7071067811865437, 0.5416752204197035)), keep=Keep.TOP, mode=Mode.PRIVATE)
    add(chamfer4_piece_17, mode=Mode.SUBTRACT)
    with BuildSketch(Plane(origin=(90.535988034, 16, 1.113620706), x_dir=(0, -1, 0), z_dir=(-0.7660444431189763, 0, 0.6427876096865415))) as chamfer4_piece_18_section:
        Polygon((CHAMFER4_SIZE, 0), (0, -CHAMFER4_SIZE), (0, 0), align=None)
    chamfer4_piece_18 = extrude(amount=5.765655507, mode=Mode.PRIVATE)
    chamfer4_piece_18 = split(chamfer4_piece_18, bisect_by=Plane(origin=(90.535988034, 16.32652298, 1.440143686), z_dir=(0, 0.7071067811865476, 0.7071067811865476)), keep=Keep.TOP, mode=Mode.PRIVATE)
    add(chamfer4_piece_18, mode=Mode.SUBTRACT)
    with BuildSketch(Plane(origin=(58.125826554, 12, 4.166666667), x_dir=(0, 1, 0), z_dir=(1, 0, 0))) as chamfer4_piece_19_section:
        Polygon((CHAMFER4_SIZE, 0), (0, -CHAMFER4_SIZE), (0, 0), align=None)
    chamfer4_piece_19 = extrude(amount=30.45317379, mode=Mode.PRIVATE)
    chamfer4_piece_19 = split(chamfer4_piece_19, bisect_by=Plane(origin=(58.777835625, 12, 4.623208333), z_dir=(-0.8191520442889891, 0, -0.57357643635105)), keep=Keep.TOP, mode=Mode.PRIVATE)
    add(chamfer4_piece_19, mode=Mode.SUBTRACT)
    with BuildSketch(Plane(origin=(58.125826554, 12, 4.166666667), x_dir=(0, 1, 0), z_dir=(1, 0, 0))) as chamfer4_piece_20_section:
        Polygon((CHAMFER4_SIZE, 0), (0, -CHAMFER4_SIZE), (0, 0), align=None)
    chamfer4_piece_20 = extrude(amount=30.45317379, mode=Mode.PRIVATE)
    chamfer4_piece_20 = split(chamfer4_piece_20, bisect_by=Plane(origin=(59.764573955, 12, 3.877711285), z_dir=(-0.9848077530122082, 0, 0.17364817766692958)), keep=Keep.TOP, mode=Mode.PRIVATE)
    add(chamfer4_piece_20, mode=Mode.SUBTRACT)
    with BuildSketch(Plane(origin=(58.125826554, 12, 4.166666667), x_dir=(0, 1, 0), z_dir=(1, 0, 0))) as chamfer4_piece_21_section:
        Polygon((CHAMFER4_SIZE, 0), (0, -CHAMFER4_SIZE), (0, 0), align=None)
    chamfer4_piece_21 = extrude(amount=30.45317379, mode=Mode.PRIVATE)
    chamfer4_piece_21 = split(chamfer4_piece_21, bisect_by=Plane(origin=(59.85145174, 12, 5.37496243), z_dir=(0.8191520442889892, 0, 0.5735764363510499)), keep=Keep.TOP, mode=Mode.PRIVATE)
    chamfer4_piece_21 = split(chamfer4_piece_21, bisect_by=Plane(origin=(69.35251143, 12, 17.546108701), z_dir=(-0.6427876096865347, 0, -0.766044443118982)), keep=Keep.TOP, mode=Mode.PRIVATE)
    add(chamfer4_piece_21, mode=Mode.SUBTRACT)
    with BuildSketch(Plane(origin=(58.125826554, 12, 4.166666667), x_dir=(0, 1, 0), z_dir=(1, 0, 0))) as chamfer4_piece_22_section:
        Polygon((CHAMFER4_SIZE, 0), (0, -CHAMFER4_SIZE), (0, 0), align=None)
    chamfer4_piece_22 = extrude(amount=30.45317379, mode=Mode.PRIVATE)
    chamfer4_piece_22 = split(chamfer4_piece_22, bisect_by=Plane(origin=(85.795526108, 12, 6.587451701), z_dir=(-0.9961946980917439, 0, -0.08715574274767737)), keep=Keep.TOP, mode=Mode.PRIVATE)
    chamfer4_piece_22 = split(chamfer4_piece_22, bisect_by=Plane(origin=(69.35251143, 12, 17.546108701), z_dir=(0.6427876096865347, 0, 0.766044443118982)), keep=Keep.TOP, mode=Mode.PRIVATE)
    add(chamfer4_piece_22, mode=Mode.SUBTRACT)

    # Sketch13 → Cut-Extrude9 (cut)
    with BuildSketch(Plane(origin=(112.1, 0, 0), x_dir=(0, 0, -1), z_dir=(1, 0, 0)).offset(CUT_EXTRUDE9_START)):
        with Locations((10.033333333, 16.3)):
            Circle(SKETCH13_R)
        with Locations((10.033333333, 16.3)):
            Circle(SKETCH13_R_2, mode=Mode.SUBTRACT)
    extrude(amount=-CUT_EXTRUDE9_DEPTH, mode=Mode.SUBTRACT)


solid = part.part
